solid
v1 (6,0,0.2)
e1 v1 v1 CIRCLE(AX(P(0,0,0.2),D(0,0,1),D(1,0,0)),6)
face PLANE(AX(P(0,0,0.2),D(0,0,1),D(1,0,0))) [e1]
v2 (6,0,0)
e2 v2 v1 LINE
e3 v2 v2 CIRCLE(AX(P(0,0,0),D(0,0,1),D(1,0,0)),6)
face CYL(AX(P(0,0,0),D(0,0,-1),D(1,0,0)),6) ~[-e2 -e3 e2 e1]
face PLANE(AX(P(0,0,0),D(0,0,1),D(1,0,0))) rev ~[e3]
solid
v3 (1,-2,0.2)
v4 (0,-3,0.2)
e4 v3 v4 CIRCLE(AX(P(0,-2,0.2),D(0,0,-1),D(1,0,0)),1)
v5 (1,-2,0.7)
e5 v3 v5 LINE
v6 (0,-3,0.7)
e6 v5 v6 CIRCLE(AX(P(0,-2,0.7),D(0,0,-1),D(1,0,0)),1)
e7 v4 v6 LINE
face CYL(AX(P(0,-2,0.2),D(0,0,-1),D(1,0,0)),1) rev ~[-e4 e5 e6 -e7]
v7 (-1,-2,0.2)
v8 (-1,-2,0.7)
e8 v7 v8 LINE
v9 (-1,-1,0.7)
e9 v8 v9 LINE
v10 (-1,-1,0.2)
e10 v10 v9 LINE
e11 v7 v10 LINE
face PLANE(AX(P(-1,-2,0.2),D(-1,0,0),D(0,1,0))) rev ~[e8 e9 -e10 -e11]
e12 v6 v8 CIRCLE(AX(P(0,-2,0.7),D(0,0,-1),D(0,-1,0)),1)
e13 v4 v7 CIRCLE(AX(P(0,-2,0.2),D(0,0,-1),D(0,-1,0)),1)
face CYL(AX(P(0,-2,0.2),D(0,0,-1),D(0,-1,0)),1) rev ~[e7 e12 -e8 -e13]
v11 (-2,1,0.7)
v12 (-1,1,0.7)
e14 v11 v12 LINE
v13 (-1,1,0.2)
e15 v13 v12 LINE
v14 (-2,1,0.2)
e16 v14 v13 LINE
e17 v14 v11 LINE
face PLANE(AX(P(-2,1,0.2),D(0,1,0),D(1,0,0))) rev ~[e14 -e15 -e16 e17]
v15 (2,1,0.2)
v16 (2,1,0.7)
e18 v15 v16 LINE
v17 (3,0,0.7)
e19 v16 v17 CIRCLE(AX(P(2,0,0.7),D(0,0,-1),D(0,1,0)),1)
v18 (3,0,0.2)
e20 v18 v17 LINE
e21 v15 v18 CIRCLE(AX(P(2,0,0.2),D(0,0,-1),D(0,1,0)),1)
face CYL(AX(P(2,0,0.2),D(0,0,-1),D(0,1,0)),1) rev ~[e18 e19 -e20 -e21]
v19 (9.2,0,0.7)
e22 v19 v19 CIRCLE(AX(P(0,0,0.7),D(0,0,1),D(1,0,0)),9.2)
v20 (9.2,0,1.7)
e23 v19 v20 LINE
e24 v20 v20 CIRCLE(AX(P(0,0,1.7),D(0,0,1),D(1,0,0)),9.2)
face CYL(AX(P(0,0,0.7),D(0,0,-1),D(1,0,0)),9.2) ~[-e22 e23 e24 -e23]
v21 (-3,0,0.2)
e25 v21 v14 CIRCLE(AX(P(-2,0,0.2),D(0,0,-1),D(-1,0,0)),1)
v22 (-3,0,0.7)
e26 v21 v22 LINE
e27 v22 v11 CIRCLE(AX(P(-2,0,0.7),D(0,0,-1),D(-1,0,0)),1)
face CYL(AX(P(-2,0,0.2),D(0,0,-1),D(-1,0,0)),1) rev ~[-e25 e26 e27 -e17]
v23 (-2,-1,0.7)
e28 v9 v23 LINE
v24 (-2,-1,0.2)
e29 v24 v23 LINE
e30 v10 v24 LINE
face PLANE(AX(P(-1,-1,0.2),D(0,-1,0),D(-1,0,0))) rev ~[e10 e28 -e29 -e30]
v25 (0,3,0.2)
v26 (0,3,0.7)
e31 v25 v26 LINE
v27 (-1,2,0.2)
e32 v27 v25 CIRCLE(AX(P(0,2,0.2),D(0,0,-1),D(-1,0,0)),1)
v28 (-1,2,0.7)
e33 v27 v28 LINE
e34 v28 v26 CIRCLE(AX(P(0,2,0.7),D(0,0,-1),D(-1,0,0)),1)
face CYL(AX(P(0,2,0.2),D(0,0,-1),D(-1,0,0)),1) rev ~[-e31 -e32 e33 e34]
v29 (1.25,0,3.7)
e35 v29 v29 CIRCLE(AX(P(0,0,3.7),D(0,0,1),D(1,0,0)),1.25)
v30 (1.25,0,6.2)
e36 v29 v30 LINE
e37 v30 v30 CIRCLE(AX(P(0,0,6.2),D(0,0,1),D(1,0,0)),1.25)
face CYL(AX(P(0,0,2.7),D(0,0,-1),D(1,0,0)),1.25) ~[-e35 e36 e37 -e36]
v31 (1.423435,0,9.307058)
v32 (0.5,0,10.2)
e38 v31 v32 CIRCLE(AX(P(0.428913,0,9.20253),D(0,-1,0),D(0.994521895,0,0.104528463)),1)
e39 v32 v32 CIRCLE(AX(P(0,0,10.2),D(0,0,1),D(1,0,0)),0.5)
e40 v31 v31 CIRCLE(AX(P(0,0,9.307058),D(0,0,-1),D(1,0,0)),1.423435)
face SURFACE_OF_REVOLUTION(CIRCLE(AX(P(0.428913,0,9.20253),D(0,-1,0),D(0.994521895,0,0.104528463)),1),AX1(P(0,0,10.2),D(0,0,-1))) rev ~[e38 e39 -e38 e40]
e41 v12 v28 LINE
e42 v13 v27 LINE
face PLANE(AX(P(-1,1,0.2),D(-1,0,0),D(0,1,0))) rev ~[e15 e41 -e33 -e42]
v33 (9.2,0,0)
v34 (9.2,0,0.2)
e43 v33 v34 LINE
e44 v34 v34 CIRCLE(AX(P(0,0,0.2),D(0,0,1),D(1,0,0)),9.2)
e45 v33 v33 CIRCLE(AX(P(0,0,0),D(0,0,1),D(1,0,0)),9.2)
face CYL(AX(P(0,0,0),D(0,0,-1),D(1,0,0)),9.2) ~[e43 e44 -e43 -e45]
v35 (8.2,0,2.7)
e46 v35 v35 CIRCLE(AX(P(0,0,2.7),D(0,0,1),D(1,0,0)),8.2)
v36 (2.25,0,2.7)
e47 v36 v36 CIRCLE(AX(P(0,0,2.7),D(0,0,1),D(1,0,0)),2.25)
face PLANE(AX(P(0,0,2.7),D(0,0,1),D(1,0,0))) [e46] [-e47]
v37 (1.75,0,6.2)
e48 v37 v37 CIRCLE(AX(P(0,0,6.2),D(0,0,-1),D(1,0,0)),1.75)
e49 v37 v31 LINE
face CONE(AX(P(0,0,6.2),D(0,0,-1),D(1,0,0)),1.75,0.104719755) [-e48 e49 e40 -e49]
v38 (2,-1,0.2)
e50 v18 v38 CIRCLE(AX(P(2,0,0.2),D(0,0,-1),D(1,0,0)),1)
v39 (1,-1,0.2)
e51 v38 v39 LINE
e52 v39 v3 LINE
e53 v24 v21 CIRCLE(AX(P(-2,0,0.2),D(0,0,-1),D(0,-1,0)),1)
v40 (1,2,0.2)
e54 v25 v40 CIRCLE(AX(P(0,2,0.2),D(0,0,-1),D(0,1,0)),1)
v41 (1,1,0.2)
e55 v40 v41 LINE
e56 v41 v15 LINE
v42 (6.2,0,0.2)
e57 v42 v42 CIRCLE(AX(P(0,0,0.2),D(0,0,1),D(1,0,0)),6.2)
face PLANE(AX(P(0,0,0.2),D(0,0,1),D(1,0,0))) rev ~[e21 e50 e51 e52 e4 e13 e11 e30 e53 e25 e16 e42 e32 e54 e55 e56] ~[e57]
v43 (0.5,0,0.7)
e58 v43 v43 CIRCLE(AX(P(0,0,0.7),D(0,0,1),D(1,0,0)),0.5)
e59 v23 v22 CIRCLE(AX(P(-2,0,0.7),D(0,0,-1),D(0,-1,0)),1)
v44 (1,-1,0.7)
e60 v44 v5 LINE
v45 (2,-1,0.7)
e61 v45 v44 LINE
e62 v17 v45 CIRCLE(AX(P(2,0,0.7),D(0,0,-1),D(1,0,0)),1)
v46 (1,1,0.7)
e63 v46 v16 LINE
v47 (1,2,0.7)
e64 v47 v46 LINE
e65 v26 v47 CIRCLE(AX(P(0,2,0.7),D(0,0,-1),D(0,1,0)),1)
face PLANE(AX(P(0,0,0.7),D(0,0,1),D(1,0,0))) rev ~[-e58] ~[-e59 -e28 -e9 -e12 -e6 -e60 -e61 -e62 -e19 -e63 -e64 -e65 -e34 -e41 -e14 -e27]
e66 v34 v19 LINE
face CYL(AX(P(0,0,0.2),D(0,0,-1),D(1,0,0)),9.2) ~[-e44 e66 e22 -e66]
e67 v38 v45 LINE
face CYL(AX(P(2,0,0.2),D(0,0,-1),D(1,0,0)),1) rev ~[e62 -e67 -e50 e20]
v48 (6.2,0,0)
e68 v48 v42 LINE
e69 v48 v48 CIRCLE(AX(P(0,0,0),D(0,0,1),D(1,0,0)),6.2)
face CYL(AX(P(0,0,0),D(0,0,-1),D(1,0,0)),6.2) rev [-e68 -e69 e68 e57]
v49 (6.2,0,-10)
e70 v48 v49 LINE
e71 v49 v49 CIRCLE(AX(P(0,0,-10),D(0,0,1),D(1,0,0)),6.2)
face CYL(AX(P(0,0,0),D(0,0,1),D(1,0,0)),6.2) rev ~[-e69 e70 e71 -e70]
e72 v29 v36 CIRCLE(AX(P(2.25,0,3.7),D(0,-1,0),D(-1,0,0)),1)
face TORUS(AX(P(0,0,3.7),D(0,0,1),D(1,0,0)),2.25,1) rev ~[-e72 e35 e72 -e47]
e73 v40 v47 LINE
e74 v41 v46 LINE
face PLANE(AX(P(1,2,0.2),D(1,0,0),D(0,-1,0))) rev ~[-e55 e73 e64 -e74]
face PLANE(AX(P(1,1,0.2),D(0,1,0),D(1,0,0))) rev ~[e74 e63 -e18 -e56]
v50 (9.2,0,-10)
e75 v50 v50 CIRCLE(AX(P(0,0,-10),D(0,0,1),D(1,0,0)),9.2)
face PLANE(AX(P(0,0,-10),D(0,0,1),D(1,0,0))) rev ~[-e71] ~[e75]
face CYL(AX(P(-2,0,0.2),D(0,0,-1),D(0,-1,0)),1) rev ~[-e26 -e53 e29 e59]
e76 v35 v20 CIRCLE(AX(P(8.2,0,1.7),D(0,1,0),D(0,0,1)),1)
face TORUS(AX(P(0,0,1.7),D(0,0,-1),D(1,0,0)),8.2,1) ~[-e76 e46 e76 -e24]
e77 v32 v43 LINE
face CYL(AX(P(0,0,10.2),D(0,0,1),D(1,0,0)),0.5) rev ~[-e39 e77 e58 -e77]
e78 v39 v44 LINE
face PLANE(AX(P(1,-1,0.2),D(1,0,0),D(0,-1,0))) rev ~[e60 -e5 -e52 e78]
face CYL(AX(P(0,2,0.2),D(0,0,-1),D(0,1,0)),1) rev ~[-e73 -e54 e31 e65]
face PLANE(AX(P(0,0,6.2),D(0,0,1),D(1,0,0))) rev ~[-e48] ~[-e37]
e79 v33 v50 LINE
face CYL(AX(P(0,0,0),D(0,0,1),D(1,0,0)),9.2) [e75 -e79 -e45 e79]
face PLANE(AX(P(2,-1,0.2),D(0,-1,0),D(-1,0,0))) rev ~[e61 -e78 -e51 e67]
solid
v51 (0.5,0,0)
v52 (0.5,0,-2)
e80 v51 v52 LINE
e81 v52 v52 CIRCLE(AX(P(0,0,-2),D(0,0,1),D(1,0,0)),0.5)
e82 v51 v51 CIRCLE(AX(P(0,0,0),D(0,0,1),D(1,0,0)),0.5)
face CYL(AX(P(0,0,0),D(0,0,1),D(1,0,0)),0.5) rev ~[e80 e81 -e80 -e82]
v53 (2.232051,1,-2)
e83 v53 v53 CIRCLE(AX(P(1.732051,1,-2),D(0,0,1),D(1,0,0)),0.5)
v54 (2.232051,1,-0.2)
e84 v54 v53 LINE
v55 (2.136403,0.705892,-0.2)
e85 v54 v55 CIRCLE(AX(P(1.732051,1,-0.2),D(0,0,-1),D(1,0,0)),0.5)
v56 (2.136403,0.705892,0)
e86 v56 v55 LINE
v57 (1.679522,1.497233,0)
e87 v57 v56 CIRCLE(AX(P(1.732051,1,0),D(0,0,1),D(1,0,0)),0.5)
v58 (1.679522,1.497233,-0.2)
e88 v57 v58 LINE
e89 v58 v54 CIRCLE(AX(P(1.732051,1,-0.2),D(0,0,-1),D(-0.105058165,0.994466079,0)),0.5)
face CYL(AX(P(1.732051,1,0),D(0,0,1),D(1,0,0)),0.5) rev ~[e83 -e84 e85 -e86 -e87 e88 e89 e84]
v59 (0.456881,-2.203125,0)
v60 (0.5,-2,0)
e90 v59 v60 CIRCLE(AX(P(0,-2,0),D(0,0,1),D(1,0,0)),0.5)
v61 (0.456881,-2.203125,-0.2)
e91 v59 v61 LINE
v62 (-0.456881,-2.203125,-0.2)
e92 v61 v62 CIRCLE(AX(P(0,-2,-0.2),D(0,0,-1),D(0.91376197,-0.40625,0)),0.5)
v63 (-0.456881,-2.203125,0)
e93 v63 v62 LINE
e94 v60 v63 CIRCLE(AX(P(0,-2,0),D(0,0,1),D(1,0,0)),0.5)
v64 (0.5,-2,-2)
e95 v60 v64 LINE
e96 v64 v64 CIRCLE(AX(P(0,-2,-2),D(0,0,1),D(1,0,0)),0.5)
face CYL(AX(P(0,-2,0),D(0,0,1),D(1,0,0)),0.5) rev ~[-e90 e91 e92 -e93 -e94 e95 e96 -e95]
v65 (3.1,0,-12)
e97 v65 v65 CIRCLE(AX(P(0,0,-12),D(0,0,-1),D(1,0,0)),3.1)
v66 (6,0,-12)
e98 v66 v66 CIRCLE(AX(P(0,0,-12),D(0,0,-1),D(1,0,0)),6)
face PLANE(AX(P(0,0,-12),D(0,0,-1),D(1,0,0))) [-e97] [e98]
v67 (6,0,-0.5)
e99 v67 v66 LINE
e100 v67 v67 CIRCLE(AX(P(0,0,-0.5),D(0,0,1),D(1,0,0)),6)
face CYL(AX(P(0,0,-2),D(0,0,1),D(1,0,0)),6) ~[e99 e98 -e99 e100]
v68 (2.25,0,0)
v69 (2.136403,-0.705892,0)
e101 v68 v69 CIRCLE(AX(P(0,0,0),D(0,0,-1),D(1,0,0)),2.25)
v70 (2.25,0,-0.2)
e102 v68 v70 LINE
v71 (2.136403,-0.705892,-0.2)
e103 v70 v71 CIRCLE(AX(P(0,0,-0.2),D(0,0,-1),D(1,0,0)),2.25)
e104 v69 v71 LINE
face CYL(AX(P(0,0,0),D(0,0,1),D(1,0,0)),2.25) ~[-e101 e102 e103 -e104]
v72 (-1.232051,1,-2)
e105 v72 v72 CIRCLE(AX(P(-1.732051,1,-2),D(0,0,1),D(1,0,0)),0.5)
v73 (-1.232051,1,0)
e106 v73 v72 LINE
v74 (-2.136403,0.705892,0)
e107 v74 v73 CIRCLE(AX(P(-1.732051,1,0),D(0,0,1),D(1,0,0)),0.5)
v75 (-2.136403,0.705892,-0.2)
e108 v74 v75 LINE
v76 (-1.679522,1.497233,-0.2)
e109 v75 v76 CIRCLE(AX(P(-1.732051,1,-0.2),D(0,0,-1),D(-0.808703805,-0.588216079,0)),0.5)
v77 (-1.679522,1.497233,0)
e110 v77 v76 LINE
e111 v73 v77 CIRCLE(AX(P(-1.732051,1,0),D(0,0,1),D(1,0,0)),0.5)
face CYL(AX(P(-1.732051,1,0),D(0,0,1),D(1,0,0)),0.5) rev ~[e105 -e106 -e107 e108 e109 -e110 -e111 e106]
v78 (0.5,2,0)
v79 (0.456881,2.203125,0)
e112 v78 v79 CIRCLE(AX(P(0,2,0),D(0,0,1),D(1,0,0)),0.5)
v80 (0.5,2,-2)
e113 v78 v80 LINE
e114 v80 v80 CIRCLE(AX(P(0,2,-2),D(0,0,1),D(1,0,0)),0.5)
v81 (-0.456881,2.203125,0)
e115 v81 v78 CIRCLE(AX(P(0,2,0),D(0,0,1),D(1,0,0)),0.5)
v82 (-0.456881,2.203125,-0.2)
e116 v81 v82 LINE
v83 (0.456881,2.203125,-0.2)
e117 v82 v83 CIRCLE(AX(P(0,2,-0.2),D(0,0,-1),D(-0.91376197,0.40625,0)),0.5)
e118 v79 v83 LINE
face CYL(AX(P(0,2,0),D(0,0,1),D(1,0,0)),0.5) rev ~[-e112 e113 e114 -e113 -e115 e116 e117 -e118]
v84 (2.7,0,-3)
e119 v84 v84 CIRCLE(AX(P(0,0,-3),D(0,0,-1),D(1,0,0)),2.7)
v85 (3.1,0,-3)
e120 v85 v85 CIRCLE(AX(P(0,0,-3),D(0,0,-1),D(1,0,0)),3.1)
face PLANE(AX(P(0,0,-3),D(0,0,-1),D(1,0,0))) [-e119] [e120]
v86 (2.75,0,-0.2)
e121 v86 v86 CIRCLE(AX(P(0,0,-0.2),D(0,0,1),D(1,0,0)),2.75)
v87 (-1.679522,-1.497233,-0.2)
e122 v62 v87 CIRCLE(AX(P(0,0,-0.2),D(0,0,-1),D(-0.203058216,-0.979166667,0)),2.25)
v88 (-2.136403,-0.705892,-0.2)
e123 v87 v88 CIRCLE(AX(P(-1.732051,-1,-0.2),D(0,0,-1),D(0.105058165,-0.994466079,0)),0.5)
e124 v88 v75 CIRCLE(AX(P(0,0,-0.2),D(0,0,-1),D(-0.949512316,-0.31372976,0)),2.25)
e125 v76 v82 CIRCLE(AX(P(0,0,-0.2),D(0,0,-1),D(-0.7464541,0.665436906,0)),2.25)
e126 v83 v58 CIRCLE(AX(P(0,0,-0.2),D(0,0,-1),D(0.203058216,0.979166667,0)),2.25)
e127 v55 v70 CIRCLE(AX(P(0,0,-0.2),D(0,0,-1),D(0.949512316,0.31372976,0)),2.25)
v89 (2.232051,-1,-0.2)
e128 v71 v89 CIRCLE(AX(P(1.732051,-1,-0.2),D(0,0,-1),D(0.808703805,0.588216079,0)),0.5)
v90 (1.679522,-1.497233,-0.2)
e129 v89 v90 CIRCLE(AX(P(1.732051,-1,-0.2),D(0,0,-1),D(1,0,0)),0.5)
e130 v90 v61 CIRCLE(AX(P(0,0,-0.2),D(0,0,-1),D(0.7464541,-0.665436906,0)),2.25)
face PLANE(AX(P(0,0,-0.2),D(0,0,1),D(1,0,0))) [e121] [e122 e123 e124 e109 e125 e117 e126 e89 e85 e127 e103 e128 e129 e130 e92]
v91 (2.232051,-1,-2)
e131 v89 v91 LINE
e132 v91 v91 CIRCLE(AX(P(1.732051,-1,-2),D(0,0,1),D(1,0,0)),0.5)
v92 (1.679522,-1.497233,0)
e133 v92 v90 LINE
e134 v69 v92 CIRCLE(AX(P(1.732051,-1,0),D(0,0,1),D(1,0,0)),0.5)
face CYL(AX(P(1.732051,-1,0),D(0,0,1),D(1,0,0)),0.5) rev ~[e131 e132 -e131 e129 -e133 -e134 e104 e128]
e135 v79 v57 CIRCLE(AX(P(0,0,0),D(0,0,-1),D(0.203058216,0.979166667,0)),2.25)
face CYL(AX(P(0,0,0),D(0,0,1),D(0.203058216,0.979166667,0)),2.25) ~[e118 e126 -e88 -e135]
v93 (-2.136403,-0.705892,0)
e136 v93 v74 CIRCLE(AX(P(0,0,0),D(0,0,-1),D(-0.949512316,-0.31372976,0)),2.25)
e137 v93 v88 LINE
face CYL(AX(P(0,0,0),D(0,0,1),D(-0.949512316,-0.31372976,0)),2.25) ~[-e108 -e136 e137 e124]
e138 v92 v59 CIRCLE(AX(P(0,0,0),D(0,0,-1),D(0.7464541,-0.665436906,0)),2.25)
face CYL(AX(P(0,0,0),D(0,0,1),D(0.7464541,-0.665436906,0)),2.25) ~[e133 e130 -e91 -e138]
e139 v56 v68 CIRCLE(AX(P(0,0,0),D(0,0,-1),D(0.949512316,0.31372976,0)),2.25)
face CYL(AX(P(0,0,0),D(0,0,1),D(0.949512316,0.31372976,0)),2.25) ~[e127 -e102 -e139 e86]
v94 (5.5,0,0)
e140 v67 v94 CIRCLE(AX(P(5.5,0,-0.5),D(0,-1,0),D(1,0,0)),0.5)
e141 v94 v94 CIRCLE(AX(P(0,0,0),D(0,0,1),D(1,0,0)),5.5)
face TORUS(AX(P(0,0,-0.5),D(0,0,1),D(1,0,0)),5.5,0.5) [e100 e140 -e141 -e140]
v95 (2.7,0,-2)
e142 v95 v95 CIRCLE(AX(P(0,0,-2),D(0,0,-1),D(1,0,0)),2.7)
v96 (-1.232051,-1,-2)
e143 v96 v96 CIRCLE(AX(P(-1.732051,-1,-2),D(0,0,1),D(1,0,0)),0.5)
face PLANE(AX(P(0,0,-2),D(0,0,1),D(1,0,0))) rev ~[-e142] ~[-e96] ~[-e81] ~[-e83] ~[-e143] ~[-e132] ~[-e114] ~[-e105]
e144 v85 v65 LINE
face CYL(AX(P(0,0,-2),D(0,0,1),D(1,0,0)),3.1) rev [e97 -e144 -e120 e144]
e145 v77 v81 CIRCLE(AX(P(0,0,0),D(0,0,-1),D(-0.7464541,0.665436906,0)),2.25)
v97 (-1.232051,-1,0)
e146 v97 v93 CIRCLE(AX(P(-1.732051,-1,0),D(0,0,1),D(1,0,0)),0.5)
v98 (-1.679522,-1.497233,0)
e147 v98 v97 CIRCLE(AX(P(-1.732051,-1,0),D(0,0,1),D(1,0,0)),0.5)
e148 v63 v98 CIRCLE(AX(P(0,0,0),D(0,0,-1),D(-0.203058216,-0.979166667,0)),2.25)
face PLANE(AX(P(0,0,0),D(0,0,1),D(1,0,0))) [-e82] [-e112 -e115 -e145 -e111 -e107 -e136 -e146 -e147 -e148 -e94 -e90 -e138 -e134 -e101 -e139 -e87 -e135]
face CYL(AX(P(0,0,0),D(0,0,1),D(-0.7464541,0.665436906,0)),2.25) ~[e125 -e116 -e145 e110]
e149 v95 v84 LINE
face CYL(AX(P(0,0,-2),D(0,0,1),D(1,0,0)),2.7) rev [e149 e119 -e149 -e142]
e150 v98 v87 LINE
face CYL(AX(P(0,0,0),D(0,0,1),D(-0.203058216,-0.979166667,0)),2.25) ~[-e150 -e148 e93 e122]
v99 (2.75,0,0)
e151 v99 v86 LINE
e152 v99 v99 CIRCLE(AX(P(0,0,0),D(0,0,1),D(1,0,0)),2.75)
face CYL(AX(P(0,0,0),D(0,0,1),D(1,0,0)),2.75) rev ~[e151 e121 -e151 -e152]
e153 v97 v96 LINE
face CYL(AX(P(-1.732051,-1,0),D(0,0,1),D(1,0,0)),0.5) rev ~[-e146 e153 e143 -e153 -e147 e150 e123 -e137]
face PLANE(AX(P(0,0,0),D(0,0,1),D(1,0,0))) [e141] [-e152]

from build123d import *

# Parameters (mm, degrees)
F0_R      = 6
F0_R_2    = 3.1
F0_R_3    = 0.5
F1_DEPTH  = 2
F2_R      = 2.75
F3_DEPTH  = 0.2
F4_R      = 3.1
F4_R_2    = 2.7
F5_DEPTH  = 1
F4_R_3    = 6
F6_DEPTH  = 10
F8_R      = 6
F8_R_2    = 0.5
F9_DEPTH  = 0.2
F8_R_3    = 9.2
F8_R_4    = 6.2
F10_DEPTH = 10
F11_DEPTH = 0.2
F12_R     = 9.2
F12_R_2   = 6.2
F13_DEPTH = 0.5
F14_R     = 9.2
F15_DEPTH = 2
F16_R     = 1.25
F17_DEPTH = 3.5
F18_R     = 1.75
F18_R_2   = 1.25
F19_DEPTH = 4
F19_TAPER = 6
F20_R     = 0.5
F21_DEPTH = 25
F23_R     = 0.5


# Not quite as in the source:
# - a fillet or chamfer that OpenCascade refuses, or shapes differently, is made with other operations: its cross-section is extruded or revolved along the edge and cut away or added
# - a feature names something its author has since deleted; it is built from what else it names


with BuildPart() as f1:
    # F0 (on Top) → F1 (new body)
    with BuildSketch(Plane.XY):
        Circle(F0_R)
        Circle(F0_R_2, mode=Mode.SUBTRACT)
        Circle(F0_R_2)
        with Locations((-1.7320508076, -1)):
            Circle(F0_R_3, mode=Mode.SUBTRACT)
        with Locations((0, -2)):
            Circle(F0_R_3, mode=Mode.SUBTRACT)
        with Locations((1.7320508076, -1)):
            Circle(F0_R_3, mode=Mode.SUBTRACT)
        with Locations((-1.7320508076, 1)):
            Circle(F0_R_3, mode=Mode.SUBTRACT)
        Circle(F0_R_3, mode=Mode.SUBTRACT)
        with Locations((1.7320508076, 1)):
            Circle(F0_R_3, mode=Mode.SUBTRACT)
        with Locations((0, 2)):
            Circle(F0_R_3, mode=Mode.SUBTRACT)
    extrude(amount=-F1_DEPTH)

    # F2 (on face) → F3 (cut)
    with BuildSketch(Plane.XY):
        Circle(F2_R)
        with BuildLine():
            ThreePointArc((2.1364027102, 0.7058919606), (2.221419152, 0.3574869943), (2.25, 0))
            ThreePointArc((2.25, 0), (2.221419152, -0.3574869943), (2.1364027102, -0.7058919606))
            ThreePointArc((2.1364027102, -0.7058919606), (2.2075379006, -0.845364867), (2.2320508076, -1))
            ThreePointArc((2.2320508076, -1), (2.0665171428, -1.3716615), (1.6795217253, -1.4972330394))
            ThreePointArc((1.6795217253, -1.4972330394), (1.125, -1.9485571585), (0.4568809849, -2.203125))
            ThreePointArc((0.4568809849, -2.203125), (0, -2.5), (-0.4568809849, -2.203125))
            ThreePointArc((-0.4568809849, -2.203125), (-1.125, -1.9485571585), (-1.6795217253, -1.4972330394))
            ThreePointArc((-1.6795217253, -1.4972330394), (-2.1650635095, -1.25), (-2.1364027102, -0.7058919606))
            ThreePointArc((-2.1364027102, -0.7058919606), (-2.25, 0), (-2.1364027102, 0.7058919606))
            ThreePointArc((-2.1364027102, 0.7058919606), (-2.1650635095, 1.25), (-1.6795217253, 1.4972330394))
            ThreePointArc((-1.6795217253, 1.4972330394), (-1.125, 1.9485571585), (-0.4568809849, 2.203125))
            ThreePointArc((-0.4568809849, 2.203125), (0, 2.5), (0.4568809849, 2.203125))
            ThreePointArc((0.4568809849, 2.203125), (1.125, 1.9485571585), (1.6795217253, 1.4972330394))
            ThreePointArc((1.6795217253, 1.4972330394), (2.0665171428, 1.3716615), (2.2320508076, 1))
            ThreePointArc((2.2320508076, 1), (2.2075379006, 0.845364867), (2.1364027102, 0.7058919606))
        make_face(mode=Mode.SUBTRACT)
    extrude(amount=-F3_DEPTH, mode=Mode.SUBTRACT)

    # F4 (on face) → F5 (join)
    with BuildSketch(Plane(origin=(0, 0, -2), x_dir=(1, 0, 0), z_dir=(0, 0, -1))):
        Circle(F4_R)
        Circle(F4_R_2, mode=Mode.SUBTRACT)
    extrude(amount=F5_DEPTH)

    # F4 (on face) → F6 (join)
    with BuildSketch(Plane(origin=(0, 0, -2), x_dir=(1, 0, 0), z_dir=(0, 0, -1))):
        Circle(F4_R_3)
        Circle(F4_R, mode=Mode.SUBTRACT)
    extrude(amount=F6_DEPTH)

    # F23
    f23_edges = [f1.edges().sort_by_distance(p)[0] for p in [
        (-6, 0, 0),
    ]]
    fillet(f23_edges, radius=F23_R)


with BuildPart() as f9:
    # F8 (on offset) → F9 (new body)
    with BuildSketch(Plane.XY):
        Circle(F8_R)
        with Locations((-1.7320508076, -1)):
            Circle(F8_R_2, mode=Mode.SUBTRACT)
        with Locations((0, -2)):
            Circle(F8_R_2, mode=Mode.SUBTRACT)
        with Locations((1.7320508076, -1)):
            Circle(F8_R_2, mode=Mode.SUBTRACT)
        with Locations((-1.7320508076, 1)):
            Circle(F8_R_2, mode=Mode.SUBTRACT)
        Circle(F8_R_2, mode=Mode.SUBTRACT)
        with Locations((1.7320508076, 1)):
            Circle(F8_R_2, mode=Mode.SUBTRACT)
        with Locations((0, 2)):
            Circle(F8_R_2, mode=Mode.SUBTRACT)
        with Locations((-1.7320508076, 1)):
            Circle(F8_R_2)
        with Locations((0, 2)):
            Circle(F8_R_2)
        with Locations((1.7320508076, 1)):
            Circle(F8_R_2)
        with Locations((1.7320508076, -1)):
            Circle(F8_R_2)
        with Locations((0, -2)):
            Circle(F8_R_2)
        with Locations((-1.7320508076, -1)):
            Circle(F8_R_2)
        Circle(F8_R_2)
    extrude(amount=F9_DEPTH)


with BuildPart() as f10:
    # F8 (on offset) → F10 (new body)
    with BuildSketch(Plane.XY):
        Circle(F8_R_3)
        Circle(F8_R_4, mode=Mode.SUBTRACT)
    extrude(amount=-F10_DEPTH)

    # F11 (add): a face of the model
    f11_faces = [f10.faces().sort_by_distance(p)[0] for p in [
        (-8.9397847045, 0, 0),
    ]]
    extrude(f11_faces, amount=F11_DEPTH)

    # F12 (on face) → F13 (join)
    with BuildSketch(Plane.XY.offset(0.2)):
        Circle(F12_R)
        Circle(F12_R_2, mode=Mode.SUBTRACT)
        Circle(F12_R_2)
        with BuildLine():
            ThreePointArc((-3, 0), (-2.7071067812, 0.7071067812), (-2, 1))
            Line((-2, 1), (-1, 1))
            Line((-1, 1), (-1, 2))
            ThreePointArc((-1, 2), (-0.7071067812, 2.7071067812), (0, 3))
            ThreePointArc((0, 3), (0.7071067812, 2.7071067812), (1, 2))
            Line((1, 2), (1, 1))
            Line((1, 1), (2, 1))
            ThreePointArc((2, 1), (2.7071067812, 0.7071067812), (3, 0))
            ThreePointArc((3, 0), (2.7071067812, -0.7071067812), (2, -1))
            Line((2, -1), (1, -1))
            Line((1, -1), (1, -2))
            ThreePointArc((1, -2), (0.7071067812, -2.7071067812), (0, -3))
            ThreePointArc((0, -3), (-0.7071067812, -2.7071067812), (-1, -2))
            Line((-1, -2), (-1, -1))
            Line((-1, -1), (-2, -1))
            ThreePointArc((-2, -1), (-2.7071067812, -0.7071067812), (-3, 0))
        make_face(mode=Mode.SUBTRACT)
    extrude(amount=F13_DEPTH)

    # F14 (on face) → F15 (join)
    with BuildSketch(Plane.XY.offset(0.7)):
        Circle(F14_R)
        with BuildLine():
            ThreePointArc((1, -2), (0, -3), (-1, -2))
            Line((-1, -2), (-1, -1))
            Line((-1, -1), (-2, -1))
            ThreePointArc((-2, -1), (-3, 0), (-2, 1))
            Line((-2, 1), (-1, 1))
            Line((-1, 1), (-1, 2))
            ThreePointArc((-1, 2), (0, 3), (1, 2))
            Line((1, 2), (1, 1))
            Line((1, 1), (2, 1))
            ThreePointArc((2, 1), (3, 0), (2, -1))
            Line((2, -1), (1, -1))
            Line((1, -1), (1, -2))
        make_face(mode=Mode.SUBTRACT)
        with BuildLine():
            Line((-1, -1), (-1, -2))
            ThreePointArc((-1, -2), (0, -3), (1, -2))
            Line((1, -2), (1, -1))
            Line((1, -1), (2, -1))
            ThreePointArc((2, -1), (3, 0), (2, 1))
            Line((2, 1), (1, 1))
            Line((1, 1), (1, 2))
            ThreePointArc((1, 2), (0, 3), (-1, 2))
            Line((-1, 2), (-1, 1))
            Line((-1, 1), (-2, 1))
            ThreePointArc((-2, 1), (-3, 0), (-2, -1))
            Line((-2, -1), (-1, -1))
        make_face()
    extrude(amount=F15_DEPTH)

    # F16 (on face) → F17 (join)
    with BuildSketch(Plane.XY.offset(2.7)):
        Circle(F16_R)
    extrude(amount=F17_DEPTH)

    # F18 (on face) → F19 (join)
    with BuildSketch(Plane.XY.offset(6.2)):
        Circle(F18_R)
        Circle(F18_R_2, mode=Mode.SUBTRACT)
        Circle(F18_R_2)
    extrude(amount=F19_DEPTH, taper=F19_TAPER)

    # F20 (on face) → F21 (cut)
    with BuildSketch(Plane.XY.offset(10.2)):
        Circle(F20_R)
    extrude(amount=-F21_DEPTH, mode=Mode.SUBTRACT)

    # F22: fillet of radius 1 on 3 edges, made by hand

    # F22_s1 → F22_t2 (revolve)
    with BuildSketch(Plane.XZ):
        with BuildLine():
            ThreePointArc((1.25, 3.7), (1.5428932188, 2.9928932188), (2.25, 2.7))
            Line((2.25, 2.7), (1.25, 2.7))
            Line((1.25, 2.7), (1.25, 3.7))
        make_face()
    revolve(axis=Axis((0, 0, 2.7), (0, 0, 1)))

    # F22_s3 → F22_t4 (revolve, cut)
    with BuildSketch(Plane.XZ):
        with BuildLine():
            ThreePointArc((1.4234350097, 9.3070583361), (1.1240510304, 9.9214062722), (0.5, 10.2))
            Line((0.5, 10.2), (1.3295830589, 10.2))
            Line((1.3295830589, 10.2), (1.4234350097, 9.3070583361))
        make_face()
    revolve(axis=Axis((0, 0, 10.2), (0, 0, -1)), mode=Mode.SUBTRACT)

    # F22_s5 → F22_t6 (revolve, cut)
    with BuildSketch(Plane.XZ):
        with BuildLine():
            ThreePointArc((8.2, 2.7), (8.9071067812, 2.4071067812), (9.2, 1.7))
            Line((9.2, 1.7), (9.2, 2.7))
            Line((9.2, 2.7), (8.2, 2.7))
        make_face()
    revolve(axis=Axis((0, 0, 2.7), (0, 0, 1)), mode=Mode.SUBTRACT)


solid = Compound([f1.part, f9.part, f10.part])
